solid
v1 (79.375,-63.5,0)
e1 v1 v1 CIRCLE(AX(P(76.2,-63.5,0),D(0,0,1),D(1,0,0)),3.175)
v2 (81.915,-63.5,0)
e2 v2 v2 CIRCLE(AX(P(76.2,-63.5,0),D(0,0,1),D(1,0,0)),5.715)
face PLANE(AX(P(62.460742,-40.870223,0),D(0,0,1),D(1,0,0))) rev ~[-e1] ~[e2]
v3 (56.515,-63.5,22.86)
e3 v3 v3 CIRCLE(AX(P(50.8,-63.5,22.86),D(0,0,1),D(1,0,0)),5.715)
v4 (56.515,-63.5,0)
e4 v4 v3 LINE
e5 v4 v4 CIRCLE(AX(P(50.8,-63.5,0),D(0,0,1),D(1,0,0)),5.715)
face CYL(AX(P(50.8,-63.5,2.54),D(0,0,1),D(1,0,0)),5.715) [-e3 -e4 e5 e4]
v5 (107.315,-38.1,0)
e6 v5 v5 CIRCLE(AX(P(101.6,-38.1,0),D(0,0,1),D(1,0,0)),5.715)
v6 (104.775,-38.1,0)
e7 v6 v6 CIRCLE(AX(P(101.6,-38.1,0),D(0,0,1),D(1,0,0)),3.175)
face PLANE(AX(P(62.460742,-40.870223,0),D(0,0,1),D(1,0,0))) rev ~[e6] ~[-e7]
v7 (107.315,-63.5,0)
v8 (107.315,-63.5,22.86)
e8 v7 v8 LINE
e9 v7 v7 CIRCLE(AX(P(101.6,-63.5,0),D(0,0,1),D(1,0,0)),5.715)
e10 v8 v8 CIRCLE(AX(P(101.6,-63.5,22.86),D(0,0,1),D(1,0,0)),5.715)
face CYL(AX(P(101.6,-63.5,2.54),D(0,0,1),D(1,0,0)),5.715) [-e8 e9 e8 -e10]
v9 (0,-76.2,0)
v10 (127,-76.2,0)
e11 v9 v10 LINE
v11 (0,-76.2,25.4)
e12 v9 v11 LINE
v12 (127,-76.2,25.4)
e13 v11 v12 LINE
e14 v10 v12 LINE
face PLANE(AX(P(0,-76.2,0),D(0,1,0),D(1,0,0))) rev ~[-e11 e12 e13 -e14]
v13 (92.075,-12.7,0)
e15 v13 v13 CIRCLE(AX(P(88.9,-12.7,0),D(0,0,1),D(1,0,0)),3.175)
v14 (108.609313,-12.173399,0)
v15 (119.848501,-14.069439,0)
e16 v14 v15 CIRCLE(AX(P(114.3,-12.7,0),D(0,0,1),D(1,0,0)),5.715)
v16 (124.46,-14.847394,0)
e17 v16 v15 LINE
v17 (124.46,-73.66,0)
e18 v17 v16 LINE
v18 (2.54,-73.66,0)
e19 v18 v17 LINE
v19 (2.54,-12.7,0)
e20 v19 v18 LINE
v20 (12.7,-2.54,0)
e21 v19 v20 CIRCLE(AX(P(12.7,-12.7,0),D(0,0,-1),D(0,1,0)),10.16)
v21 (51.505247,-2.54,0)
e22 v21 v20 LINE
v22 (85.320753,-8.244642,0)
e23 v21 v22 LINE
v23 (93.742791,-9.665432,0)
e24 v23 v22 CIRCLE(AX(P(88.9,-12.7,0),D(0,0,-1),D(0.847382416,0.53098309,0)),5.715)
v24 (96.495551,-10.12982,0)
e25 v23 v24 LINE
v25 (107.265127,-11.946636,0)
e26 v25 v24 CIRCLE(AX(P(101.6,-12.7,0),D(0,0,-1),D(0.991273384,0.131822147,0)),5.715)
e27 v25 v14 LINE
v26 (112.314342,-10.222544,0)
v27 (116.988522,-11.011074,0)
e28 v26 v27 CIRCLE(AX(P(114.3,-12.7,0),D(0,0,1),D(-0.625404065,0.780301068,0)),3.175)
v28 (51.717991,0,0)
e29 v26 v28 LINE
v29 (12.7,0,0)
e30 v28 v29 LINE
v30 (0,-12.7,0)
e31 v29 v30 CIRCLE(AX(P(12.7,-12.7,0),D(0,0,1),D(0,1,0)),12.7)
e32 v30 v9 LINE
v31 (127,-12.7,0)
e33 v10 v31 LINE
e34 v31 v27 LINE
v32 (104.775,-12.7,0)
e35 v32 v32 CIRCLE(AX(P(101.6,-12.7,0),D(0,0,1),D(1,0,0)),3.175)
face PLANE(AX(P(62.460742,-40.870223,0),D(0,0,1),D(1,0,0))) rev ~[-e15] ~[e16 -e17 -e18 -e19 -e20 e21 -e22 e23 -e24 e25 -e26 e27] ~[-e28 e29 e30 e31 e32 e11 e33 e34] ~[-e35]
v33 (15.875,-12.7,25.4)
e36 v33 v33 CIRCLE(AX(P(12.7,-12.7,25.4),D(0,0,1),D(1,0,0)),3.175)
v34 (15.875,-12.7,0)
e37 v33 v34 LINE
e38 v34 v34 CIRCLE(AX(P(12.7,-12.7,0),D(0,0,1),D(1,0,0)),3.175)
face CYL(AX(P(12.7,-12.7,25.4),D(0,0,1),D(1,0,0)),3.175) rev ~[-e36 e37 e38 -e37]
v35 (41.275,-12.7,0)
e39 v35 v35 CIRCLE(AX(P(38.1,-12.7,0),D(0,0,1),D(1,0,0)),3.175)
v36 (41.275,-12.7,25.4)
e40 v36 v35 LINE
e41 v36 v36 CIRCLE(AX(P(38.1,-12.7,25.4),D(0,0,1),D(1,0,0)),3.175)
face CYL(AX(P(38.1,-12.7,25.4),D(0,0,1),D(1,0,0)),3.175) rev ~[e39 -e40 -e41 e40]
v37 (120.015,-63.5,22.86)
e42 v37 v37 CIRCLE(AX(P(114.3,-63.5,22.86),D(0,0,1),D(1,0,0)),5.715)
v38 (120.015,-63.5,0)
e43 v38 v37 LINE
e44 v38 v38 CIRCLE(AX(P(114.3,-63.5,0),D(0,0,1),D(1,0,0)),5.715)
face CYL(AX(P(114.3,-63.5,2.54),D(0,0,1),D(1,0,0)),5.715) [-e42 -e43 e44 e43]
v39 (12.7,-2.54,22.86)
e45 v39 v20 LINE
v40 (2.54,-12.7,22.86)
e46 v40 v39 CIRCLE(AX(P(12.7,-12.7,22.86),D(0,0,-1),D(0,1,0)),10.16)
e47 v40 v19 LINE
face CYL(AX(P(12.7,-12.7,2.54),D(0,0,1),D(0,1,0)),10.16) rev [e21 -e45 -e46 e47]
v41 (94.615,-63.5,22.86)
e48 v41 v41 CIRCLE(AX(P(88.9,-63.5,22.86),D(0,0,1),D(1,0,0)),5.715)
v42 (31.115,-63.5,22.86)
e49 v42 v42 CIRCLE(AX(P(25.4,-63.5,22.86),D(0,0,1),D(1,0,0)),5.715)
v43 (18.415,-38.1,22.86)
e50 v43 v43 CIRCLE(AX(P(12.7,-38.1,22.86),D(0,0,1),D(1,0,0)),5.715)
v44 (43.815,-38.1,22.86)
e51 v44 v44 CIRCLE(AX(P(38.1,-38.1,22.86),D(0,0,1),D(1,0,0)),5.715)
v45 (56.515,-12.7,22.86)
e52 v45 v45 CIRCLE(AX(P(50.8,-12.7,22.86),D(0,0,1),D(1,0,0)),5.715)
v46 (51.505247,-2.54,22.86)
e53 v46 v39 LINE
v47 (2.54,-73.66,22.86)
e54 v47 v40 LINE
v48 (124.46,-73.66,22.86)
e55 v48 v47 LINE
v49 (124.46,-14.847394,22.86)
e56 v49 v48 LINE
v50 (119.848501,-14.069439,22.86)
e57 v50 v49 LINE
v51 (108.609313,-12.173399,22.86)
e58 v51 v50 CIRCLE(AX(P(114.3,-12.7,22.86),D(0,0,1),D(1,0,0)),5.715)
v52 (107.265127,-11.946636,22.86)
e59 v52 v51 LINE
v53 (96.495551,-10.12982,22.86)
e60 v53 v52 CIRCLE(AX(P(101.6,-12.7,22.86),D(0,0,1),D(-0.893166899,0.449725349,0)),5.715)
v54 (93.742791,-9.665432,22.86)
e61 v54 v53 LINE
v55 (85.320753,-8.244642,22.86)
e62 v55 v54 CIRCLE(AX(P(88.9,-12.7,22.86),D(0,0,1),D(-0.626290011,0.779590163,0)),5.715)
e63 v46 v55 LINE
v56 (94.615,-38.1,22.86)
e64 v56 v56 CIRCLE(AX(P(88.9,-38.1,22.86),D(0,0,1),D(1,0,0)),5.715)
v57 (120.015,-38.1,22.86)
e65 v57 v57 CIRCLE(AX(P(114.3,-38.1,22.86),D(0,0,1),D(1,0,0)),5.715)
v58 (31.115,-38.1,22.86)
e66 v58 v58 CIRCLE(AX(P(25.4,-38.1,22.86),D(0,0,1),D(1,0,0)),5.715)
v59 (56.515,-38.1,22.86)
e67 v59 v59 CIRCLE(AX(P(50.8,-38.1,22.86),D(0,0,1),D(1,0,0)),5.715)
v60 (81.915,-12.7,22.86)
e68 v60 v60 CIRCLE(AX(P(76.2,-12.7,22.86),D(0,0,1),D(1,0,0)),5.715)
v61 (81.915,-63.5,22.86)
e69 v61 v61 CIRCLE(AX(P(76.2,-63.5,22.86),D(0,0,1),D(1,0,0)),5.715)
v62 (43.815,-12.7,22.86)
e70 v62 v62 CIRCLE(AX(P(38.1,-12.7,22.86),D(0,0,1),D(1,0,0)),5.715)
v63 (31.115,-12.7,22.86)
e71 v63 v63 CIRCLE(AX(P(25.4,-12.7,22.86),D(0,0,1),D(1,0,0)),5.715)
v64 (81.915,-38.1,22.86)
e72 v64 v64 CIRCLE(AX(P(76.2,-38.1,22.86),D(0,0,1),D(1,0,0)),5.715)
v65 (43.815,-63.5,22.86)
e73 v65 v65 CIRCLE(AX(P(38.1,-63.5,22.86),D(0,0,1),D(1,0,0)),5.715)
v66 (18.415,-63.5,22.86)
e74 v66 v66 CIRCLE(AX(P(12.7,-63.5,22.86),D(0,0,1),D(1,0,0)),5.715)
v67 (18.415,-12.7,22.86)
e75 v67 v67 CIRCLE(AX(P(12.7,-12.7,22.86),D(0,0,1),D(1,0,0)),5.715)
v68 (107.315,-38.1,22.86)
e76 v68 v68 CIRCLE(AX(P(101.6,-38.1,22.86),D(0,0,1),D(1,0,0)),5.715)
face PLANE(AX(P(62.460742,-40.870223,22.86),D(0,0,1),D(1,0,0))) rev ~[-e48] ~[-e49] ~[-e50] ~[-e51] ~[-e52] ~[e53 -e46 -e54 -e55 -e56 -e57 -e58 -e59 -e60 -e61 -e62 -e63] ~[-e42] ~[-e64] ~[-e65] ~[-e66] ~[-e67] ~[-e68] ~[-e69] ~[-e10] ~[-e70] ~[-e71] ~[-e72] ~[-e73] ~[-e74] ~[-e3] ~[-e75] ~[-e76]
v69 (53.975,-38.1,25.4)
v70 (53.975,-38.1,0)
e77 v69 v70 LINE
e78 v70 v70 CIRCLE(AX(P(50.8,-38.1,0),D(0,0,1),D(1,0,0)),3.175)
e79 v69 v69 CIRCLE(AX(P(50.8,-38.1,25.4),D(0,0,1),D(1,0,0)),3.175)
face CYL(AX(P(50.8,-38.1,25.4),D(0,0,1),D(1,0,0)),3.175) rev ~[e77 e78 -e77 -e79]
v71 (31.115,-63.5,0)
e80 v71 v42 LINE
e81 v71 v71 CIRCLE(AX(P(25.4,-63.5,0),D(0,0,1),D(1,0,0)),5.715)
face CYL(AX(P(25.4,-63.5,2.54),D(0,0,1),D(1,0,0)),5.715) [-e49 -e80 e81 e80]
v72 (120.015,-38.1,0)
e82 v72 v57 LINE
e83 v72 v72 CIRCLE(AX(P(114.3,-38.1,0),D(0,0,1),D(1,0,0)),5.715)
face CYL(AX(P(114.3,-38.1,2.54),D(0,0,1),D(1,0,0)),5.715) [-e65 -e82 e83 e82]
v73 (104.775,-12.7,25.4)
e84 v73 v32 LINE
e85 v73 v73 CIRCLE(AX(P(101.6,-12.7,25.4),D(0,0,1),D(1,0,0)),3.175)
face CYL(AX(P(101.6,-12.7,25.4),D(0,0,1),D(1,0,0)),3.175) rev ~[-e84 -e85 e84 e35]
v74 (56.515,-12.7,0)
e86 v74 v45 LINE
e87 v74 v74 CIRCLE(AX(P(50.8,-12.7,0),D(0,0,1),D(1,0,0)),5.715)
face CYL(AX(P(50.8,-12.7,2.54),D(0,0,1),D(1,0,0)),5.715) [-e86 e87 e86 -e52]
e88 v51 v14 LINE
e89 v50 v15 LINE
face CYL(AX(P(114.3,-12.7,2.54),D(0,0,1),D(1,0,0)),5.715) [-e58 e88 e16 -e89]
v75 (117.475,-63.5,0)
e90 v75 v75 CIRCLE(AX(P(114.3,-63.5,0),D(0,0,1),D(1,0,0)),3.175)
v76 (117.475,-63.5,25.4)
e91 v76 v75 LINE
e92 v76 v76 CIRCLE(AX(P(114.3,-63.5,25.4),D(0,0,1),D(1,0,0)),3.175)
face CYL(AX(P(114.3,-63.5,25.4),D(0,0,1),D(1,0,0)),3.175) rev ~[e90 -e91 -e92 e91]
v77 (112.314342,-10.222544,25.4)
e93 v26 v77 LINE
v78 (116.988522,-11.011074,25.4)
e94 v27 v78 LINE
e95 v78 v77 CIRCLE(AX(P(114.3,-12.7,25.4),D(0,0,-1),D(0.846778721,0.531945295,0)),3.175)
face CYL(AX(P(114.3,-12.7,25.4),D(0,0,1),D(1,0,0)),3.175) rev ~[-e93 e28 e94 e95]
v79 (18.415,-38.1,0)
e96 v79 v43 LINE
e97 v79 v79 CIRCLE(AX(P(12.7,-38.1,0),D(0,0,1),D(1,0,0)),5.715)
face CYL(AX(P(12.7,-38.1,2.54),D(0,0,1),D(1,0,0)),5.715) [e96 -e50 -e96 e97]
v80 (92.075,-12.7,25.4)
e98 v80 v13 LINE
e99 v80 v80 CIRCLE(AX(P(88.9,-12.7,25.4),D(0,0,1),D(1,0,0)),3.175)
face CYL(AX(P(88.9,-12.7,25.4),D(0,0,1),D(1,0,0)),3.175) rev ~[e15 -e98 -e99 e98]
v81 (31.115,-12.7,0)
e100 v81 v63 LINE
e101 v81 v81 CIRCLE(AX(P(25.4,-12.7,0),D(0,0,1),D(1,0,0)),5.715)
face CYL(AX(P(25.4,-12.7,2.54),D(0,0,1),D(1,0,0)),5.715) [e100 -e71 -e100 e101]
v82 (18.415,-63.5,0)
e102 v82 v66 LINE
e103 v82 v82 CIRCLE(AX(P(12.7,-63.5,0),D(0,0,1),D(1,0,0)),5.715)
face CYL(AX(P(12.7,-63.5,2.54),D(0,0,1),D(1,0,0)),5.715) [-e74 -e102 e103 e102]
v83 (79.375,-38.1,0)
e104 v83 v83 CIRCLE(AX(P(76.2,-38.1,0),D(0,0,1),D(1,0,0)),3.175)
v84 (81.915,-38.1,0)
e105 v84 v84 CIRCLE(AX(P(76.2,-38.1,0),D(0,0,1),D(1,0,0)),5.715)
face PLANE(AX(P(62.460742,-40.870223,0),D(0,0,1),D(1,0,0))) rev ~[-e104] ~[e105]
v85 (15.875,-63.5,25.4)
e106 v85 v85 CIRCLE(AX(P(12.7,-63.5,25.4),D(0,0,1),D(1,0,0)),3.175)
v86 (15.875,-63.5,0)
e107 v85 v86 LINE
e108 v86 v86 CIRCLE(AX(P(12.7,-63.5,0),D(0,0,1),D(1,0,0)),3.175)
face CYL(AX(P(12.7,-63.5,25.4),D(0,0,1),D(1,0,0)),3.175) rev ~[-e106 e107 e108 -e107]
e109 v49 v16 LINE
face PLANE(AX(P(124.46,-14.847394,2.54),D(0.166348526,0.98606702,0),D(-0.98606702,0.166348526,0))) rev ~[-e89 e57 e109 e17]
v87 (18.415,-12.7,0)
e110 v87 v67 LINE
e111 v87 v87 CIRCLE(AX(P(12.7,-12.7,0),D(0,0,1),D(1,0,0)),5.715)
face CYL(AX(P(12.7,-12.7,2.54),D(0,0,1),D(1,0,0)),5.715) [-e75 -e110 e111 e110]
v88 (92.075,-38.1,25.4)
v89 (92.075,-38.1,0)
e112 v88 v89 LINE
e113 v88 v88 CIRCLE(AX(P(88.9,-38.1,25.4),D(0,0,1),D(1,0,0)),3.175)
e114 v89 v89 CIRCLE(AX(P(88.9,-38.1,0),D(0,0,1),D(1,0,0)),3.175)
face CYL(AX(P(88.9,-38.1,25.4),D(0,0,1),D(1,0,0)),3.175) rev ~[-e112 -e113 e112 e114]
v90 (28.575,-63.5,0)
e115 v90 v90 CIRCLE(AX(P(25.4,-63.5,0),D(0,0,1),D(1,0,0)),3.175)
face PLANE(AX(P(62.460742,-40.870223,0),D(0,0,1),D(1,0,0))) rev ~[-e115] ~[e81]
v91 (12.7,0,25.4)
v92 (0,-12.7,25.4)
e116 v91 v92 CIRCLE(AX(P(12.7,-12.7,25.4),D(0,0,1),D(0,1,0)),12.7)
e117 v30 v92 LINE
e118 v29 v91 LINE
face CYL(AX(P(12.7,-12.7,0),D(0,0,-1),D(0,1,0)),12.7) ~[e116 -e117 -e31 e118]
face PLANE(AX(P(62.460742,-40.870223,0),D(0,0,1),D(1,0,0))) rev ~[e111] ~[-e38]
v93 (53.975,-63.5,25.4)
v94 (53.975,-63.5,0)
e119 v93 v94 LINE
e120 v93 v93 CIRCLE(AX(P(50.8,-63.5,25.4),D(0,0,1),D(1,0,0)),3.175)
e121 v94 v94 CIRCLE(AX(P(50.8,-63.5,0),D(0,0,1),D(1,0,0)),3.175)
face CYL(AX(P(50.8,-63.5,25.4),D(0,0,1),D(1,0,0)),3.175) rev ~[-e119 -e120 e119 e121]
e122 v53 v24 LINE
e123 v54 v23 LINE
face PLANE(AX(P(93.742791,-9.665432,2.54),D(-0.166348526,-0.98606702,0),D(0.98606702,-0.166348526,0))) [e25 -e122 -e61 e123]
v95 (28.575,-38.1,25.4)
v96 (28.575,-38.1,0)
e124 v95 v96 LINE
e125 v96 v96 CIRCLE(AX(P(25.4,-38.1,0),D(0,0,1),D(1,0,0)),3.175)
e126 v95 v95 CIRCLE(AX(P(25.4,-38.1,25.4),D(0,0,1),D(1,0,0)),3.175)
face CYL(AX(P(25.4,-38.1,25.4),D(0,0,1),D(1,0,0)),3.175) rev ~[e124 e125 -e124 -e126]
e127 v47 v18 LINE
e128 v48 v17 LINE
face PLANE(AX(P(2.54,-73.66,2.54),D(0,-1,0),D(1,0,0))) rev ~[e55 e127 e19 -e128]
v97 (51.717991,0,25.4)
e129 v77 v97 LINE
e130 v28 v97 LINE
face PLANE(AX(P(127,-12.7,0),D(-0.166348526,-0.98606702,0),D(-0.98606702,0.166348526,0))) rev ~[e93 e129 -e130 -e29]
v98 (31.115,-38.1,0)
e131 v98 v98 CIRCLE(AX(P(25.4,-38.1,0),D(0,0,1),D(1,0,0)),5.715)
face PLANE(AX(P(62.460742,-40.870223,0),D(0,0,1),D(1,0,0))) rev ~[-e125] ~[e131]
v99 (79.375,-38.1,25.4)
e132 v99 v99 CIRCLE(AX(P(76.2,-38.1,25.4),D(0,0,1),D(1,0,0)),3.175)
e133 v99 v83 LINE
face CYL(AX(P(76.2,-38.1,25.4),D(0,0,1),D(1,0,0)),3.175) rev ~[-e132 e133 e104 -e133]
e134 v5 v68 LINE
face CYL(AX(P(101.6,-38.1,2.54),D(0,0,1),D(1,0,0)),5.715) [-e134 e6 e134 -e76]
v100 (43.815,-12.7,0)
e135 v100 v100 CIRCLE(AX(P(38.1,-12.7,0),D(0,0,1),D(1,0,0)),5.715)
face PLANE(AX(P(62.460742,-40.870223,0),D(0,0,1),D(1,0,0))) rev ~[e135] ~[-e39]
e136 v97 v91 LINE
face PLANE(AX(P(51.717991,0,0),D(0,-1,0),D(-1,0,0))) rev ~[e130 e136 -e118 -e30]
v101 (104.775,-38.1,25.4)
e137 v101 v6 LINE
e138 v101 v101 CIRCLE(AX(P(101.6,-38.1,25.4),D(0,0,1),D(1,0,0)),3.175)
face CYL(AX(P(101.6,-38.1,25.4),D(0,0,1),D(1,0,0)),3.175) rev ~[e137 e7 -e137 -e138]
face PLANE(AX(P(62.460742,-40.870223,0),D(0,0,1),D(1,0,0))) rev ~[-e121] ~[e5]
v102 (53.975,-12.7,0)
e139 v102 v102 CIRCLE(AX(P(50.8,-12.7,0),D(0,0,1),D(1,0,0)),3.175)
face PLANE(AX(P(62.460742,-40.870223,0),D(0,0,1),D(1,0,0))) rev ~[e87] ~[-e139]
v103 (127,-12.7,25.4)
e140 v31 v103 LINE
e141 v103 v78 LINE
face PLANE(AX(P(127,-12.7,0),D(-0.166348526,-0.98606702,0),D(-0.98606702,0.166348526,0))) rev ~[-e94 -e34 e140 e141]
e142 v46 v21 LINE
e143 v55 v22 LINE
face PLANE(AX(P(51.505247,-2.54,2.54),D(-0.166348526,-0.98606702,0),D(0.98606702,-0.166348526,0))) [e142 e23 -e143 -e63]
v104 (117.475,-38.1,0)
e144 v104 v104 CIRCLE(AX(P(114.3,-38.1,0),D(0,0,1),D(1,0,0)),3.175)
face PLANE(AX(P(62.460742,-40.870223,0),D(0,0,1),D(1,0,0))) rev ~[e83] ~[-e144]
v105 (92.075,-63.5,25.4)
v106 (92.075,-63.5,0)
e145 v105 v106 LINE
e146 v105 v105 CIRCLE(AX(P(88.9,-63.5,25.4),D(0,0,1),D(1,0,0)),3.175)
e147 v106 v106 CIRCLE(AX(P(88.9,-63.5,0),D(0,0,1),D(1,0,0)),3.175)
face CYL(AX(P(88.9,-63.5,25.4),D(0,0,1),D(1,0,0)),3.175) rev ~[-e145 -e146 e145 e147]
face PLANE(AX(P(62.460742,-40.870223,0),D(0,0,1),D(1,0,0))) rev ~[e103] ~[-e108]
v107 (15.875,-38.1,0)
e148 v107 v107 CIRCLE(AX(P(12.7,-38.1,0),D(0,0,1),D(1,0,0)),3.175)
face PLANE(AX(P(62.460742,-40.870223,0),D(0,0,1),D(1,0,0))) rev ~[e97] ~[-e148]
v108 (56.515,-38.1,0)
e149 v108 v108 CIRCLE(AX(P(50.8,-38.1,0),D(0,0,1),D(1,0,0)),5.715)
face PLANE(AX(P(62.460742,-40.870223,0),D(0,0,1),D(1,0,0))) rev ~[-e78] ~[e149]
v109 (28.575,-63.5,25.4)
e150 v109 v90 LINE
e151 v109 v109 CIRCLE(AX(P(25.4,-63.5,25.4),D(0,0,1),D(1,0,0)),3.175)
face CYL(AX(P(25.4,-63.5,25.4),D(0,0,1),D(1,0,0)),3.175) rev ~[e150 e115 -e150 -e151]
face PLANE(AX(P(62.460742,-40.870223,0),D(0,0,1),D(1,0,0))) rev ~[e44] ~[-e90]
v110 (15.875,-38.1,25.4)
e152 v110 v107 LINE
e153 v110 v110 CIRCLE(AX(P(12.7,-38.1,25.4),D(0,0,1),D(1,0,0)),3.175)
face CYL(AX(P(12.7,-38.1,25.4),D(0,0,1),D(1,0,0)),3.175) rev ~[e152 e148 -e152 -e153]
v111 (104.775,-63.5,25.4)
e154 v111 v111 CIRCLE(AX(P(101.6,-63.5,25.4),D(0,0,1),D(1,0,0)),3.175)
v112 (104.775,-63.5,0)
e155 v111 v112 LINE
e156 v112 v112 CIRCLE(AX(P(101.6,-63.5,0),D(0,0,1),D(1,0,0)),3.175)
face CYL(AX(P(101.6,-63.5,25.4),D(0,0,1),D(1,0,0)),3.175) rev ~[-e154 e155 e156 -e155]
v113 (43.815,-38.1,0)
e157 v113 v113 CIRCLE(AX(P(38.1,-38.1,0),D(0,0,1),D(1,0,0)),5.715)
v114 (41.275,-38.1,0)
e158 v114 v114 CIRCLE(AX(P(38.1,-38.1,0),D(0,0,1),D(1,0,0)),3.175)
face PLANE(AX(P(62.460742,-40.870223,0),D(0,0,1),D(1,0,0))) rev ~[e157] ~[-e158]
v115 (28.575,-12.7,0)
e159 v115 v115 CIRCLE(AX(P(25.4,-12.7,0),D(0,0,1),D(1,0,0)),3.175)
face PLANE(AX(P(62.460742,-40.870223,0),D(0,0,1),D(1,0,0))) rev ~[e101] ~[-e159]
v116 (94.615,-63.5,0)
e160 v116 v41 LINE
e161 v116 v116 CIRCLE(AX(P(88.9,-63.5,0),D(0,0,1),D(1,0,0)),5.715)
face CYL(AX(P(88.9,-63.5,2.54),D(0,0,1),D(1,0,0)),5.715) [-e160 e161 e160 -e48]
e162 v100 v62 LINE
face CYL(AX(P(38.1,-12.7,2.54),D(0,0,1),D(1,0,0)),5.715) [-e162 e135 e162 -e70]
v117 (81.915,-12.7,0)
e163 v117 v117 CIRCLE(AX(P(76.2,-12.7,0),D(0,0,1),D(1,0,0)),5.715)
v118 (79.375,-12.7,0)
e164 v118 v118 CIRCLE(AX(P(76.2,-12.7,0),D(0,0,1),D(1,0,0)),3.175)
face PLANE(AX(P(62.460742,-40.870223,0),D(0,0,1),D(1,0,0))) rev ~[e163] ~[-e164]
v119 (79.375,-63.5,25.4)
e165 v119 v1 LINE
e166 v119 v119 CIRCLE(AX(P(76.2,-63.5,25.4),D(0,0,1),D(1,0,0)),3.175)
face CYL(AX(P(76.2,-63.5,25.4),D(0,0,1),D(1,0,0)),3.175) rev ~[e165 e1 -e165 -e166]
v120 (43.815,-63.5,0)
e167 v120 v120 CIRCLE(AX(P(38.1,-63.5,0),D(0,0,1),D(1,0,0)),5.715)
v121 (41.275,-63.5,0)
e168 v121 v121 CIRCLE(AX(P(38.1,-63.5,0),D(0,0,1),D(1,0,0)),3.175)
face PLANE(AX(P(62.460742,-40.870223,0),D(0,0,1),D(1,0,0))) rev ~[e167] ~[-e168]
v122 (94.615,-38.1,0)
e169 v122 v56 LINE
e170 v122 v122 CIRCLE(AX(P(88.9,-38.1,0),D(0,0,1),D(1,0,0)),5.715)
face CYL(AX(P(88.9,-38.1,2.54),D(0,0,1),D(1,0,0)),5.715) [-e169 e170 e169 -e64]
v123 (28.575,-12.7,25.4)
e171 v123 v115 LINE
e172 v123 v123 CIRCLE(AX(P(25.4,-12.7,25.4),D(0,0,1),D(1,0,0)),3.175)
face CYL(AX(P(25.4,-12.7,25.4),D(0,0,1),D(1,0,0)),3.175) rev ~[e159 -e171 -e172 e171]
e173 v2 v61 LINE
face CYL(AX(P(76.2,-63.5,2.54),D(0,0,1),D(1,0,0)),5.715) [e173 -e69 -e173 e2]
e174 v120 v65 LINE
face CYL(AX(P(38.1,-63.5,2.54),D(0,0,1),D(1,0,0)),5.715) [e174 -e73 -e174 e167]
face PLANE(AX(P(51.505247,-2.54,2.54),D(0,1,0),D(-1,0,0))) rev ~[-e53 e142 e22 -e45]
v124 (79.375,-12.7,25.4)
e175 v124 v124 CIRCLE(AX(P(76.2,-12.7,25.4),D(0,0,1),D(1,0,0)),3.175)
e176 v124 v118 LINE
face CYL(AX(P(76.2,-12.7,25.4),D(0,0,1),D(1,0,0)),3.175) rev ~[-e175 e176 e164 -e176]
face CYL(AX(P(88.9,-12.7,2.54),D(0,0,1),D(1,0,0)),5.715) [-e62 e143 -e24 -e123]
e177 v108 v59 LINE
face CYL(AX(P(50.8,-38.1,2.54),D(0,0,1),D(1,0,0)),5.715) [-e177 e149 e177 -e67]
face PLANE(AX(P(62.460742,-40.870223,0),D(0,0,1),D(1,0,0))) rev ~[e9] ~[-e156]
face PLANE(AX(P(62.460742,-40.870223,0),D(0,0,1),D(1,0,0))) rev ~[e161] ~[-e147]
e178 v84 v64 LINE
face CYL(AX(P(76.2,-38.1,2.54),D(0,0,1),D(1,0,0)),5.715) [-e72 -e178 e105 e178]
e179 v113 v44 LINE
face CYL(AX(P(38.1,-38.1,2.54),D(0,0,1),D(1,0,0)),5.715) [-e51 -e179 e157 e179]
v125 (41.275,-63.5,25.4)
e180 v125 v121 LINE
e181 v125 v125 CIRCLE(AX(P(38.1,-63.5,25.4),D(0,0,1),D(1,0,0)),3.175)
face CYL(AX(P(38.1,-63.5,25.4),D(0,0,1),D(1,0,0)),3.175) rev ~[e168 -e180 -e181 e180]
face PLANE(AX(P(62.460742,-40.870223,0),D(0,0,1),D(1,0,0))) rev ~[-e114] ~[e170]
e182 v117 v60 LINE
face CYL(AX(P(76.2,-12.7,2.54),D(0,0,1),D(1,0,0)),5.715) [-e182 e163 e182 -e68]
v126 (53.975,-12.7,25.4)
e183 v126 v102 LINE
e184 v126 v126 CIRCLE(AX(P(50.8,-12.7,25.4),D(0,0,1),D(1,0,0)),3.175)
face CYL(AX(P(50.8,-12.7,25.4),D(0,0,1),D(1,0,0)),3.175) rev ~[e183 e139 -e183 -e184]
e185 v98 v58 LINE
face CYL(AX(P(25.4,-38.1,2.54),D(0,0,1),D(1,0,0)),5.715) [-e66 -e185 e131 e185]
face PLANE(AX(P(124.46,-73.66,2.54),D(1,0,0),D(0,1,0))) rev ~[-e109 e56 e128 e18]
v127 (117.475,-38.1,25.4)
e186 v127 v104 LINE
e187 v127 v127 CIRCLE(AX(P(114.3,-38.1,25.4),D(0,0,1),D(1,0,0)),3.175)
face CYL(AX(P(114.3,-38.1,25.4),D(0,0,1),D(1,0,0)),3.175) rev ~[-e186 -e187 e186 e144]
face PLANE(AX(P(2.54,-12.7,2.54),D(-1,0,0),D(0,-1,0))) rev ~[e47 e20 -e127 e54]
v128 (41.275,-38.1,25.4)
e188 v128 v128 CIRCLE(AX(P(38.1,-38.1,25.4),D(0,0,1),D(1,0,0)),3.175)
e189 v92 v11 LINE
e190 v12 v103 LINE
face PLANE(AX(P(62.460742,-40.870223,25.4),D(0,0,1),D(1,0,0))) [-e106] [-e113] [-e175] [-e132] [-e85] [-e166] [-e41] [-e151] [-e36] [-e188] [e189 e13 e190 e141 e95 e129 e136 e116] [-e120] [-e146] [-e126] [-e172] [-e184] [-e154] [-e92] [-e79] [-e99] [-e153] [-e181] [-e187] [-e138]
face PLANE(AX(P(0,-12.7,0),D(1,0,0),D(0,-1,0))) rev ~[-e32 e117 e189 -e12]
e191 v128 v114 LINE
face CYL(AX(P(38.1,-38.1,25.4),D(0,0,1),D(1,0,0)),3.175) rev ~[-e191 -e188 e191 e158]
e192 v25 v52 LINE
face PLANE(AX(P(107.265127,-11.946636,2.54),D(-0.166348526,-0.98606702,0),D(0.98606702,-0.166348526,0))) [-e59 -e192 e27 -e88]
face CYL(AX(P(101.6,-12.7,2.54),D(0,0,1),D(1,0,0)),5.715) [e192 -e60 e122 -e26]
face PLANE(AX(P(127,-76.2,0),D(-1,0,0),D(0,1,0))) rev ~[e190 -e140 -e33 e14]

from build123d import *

# Parameters (mm, degrees)
F1_DEPTH = 25.4
F2_R     = 3.175
F3_DEPTH = 25.4
F4_T     = -2.54


# Not quite as in the source:
# - a shell that OpenCascade refuses in one call is made with other operations: the cavity is built on its own and cut out


with BuildPart() as f1:
    # F0 (on Top) → F1 (new body)
    with BuildSketch(Plane.XY):
        with BuildLine():
            Line((51.71799147, 0), (12.7, 0))
            ThreePointArc((12.7, 0), (3.7197438789, -3.7197438789), (0, -12.7))
            Line((0, -12.7), (0, -76.2))
            Line((0, -76.2), (127, -76.2))
            Line((127, -76.2), (127, -12.7))
            Line((127, -12.7), (51.71799147, 0))
        make_face()
    extrude(amount=F1_DEPTH)

    # F2 (on face) → F3 (cut)
    with BuildSketch(Plane.XY.offset(25.4)):
        with Locations((12.7, -12.7)):
            Circle(F2_R)
        with Locations((12.7, -38.1)):
            Circle(F2_R)
        with Locations((12.7, -63.5)):
            Circle(F2_R)
        with Locations((25.4, -12.7)):
            Circle(F2_R)
        with Locations((25.4, -38.1)):
            Circle(F2_R)
        with Locations((25.4, -63.5)):
            Circle(F2_R)
        with Locations((38.1, -12.7)):
            Circle(F2_R)
        with Locations((38.1, -38.1)):
            Circle(F2_R)
        with Locations((38.1, -63.5)):
            Circle(F2_R)
        with Locations((50.8, -12.7)):
            Circle(F2_R)
        with Locations((50.8, -38.1)):
            Circle(F2_R)
        with Locations((50.8, -63.5)):
            Circle(F2_R)
        with Locations((114.3, -12.7)):
            Circle(F2_R)
        with Locations((101.6, -12.7)):
            Circle(F2_R)
        with Locations((88.9, -12.7)):
            Circle(F2_R)
        with Locations((114.3, -38.1)):
            Circle(F2_R)
        with Locations((101.6, -38.1)):
            Circle(F2_R)
        with Locations((88.9, -38.1)):
            Circle(F2_R)
        with Locations((114.3, -63.5)):
            Circle(F2_R)
        with Locations((101.6, -63.5)):
            Circle(F2_R)
        with Locations((88.9, -63.5)):
            Circle(F2_R)
        with Locations((76.2, -63.5)):
            Circle(F2_R)
        with Locations((76.2, -38.1)):
            Circle(F2_R)
        with Locations((76.2, -12.7)):
            Circle(F2_R)
    extrude(amount=-F3_DEPTH, mode=Mode.SUBTRACT)

    # F4: a shell. OpenCascade refuses it in one call, so the cavity is built on its own and cut out:
    # the body offset inwards by the wall thickness, plus a prism from it out through each open face.
    f4_core = offset(f1.part, amount=F4_T, kind=Kind.INTERSECTION, mode=Mode.PRIVATE)
    f4_exits = [f4_core.faces().sort_by_distance(p)[0] for p in [
        (61.661975, -40.163324, 2.54),
    ]]
    add(f4_core, mode=Mode.SUBTRACT)
    extrude(f4_exits, amount=-F4_T, mode=Mode.SUBTRACT)


solid = f1.part
